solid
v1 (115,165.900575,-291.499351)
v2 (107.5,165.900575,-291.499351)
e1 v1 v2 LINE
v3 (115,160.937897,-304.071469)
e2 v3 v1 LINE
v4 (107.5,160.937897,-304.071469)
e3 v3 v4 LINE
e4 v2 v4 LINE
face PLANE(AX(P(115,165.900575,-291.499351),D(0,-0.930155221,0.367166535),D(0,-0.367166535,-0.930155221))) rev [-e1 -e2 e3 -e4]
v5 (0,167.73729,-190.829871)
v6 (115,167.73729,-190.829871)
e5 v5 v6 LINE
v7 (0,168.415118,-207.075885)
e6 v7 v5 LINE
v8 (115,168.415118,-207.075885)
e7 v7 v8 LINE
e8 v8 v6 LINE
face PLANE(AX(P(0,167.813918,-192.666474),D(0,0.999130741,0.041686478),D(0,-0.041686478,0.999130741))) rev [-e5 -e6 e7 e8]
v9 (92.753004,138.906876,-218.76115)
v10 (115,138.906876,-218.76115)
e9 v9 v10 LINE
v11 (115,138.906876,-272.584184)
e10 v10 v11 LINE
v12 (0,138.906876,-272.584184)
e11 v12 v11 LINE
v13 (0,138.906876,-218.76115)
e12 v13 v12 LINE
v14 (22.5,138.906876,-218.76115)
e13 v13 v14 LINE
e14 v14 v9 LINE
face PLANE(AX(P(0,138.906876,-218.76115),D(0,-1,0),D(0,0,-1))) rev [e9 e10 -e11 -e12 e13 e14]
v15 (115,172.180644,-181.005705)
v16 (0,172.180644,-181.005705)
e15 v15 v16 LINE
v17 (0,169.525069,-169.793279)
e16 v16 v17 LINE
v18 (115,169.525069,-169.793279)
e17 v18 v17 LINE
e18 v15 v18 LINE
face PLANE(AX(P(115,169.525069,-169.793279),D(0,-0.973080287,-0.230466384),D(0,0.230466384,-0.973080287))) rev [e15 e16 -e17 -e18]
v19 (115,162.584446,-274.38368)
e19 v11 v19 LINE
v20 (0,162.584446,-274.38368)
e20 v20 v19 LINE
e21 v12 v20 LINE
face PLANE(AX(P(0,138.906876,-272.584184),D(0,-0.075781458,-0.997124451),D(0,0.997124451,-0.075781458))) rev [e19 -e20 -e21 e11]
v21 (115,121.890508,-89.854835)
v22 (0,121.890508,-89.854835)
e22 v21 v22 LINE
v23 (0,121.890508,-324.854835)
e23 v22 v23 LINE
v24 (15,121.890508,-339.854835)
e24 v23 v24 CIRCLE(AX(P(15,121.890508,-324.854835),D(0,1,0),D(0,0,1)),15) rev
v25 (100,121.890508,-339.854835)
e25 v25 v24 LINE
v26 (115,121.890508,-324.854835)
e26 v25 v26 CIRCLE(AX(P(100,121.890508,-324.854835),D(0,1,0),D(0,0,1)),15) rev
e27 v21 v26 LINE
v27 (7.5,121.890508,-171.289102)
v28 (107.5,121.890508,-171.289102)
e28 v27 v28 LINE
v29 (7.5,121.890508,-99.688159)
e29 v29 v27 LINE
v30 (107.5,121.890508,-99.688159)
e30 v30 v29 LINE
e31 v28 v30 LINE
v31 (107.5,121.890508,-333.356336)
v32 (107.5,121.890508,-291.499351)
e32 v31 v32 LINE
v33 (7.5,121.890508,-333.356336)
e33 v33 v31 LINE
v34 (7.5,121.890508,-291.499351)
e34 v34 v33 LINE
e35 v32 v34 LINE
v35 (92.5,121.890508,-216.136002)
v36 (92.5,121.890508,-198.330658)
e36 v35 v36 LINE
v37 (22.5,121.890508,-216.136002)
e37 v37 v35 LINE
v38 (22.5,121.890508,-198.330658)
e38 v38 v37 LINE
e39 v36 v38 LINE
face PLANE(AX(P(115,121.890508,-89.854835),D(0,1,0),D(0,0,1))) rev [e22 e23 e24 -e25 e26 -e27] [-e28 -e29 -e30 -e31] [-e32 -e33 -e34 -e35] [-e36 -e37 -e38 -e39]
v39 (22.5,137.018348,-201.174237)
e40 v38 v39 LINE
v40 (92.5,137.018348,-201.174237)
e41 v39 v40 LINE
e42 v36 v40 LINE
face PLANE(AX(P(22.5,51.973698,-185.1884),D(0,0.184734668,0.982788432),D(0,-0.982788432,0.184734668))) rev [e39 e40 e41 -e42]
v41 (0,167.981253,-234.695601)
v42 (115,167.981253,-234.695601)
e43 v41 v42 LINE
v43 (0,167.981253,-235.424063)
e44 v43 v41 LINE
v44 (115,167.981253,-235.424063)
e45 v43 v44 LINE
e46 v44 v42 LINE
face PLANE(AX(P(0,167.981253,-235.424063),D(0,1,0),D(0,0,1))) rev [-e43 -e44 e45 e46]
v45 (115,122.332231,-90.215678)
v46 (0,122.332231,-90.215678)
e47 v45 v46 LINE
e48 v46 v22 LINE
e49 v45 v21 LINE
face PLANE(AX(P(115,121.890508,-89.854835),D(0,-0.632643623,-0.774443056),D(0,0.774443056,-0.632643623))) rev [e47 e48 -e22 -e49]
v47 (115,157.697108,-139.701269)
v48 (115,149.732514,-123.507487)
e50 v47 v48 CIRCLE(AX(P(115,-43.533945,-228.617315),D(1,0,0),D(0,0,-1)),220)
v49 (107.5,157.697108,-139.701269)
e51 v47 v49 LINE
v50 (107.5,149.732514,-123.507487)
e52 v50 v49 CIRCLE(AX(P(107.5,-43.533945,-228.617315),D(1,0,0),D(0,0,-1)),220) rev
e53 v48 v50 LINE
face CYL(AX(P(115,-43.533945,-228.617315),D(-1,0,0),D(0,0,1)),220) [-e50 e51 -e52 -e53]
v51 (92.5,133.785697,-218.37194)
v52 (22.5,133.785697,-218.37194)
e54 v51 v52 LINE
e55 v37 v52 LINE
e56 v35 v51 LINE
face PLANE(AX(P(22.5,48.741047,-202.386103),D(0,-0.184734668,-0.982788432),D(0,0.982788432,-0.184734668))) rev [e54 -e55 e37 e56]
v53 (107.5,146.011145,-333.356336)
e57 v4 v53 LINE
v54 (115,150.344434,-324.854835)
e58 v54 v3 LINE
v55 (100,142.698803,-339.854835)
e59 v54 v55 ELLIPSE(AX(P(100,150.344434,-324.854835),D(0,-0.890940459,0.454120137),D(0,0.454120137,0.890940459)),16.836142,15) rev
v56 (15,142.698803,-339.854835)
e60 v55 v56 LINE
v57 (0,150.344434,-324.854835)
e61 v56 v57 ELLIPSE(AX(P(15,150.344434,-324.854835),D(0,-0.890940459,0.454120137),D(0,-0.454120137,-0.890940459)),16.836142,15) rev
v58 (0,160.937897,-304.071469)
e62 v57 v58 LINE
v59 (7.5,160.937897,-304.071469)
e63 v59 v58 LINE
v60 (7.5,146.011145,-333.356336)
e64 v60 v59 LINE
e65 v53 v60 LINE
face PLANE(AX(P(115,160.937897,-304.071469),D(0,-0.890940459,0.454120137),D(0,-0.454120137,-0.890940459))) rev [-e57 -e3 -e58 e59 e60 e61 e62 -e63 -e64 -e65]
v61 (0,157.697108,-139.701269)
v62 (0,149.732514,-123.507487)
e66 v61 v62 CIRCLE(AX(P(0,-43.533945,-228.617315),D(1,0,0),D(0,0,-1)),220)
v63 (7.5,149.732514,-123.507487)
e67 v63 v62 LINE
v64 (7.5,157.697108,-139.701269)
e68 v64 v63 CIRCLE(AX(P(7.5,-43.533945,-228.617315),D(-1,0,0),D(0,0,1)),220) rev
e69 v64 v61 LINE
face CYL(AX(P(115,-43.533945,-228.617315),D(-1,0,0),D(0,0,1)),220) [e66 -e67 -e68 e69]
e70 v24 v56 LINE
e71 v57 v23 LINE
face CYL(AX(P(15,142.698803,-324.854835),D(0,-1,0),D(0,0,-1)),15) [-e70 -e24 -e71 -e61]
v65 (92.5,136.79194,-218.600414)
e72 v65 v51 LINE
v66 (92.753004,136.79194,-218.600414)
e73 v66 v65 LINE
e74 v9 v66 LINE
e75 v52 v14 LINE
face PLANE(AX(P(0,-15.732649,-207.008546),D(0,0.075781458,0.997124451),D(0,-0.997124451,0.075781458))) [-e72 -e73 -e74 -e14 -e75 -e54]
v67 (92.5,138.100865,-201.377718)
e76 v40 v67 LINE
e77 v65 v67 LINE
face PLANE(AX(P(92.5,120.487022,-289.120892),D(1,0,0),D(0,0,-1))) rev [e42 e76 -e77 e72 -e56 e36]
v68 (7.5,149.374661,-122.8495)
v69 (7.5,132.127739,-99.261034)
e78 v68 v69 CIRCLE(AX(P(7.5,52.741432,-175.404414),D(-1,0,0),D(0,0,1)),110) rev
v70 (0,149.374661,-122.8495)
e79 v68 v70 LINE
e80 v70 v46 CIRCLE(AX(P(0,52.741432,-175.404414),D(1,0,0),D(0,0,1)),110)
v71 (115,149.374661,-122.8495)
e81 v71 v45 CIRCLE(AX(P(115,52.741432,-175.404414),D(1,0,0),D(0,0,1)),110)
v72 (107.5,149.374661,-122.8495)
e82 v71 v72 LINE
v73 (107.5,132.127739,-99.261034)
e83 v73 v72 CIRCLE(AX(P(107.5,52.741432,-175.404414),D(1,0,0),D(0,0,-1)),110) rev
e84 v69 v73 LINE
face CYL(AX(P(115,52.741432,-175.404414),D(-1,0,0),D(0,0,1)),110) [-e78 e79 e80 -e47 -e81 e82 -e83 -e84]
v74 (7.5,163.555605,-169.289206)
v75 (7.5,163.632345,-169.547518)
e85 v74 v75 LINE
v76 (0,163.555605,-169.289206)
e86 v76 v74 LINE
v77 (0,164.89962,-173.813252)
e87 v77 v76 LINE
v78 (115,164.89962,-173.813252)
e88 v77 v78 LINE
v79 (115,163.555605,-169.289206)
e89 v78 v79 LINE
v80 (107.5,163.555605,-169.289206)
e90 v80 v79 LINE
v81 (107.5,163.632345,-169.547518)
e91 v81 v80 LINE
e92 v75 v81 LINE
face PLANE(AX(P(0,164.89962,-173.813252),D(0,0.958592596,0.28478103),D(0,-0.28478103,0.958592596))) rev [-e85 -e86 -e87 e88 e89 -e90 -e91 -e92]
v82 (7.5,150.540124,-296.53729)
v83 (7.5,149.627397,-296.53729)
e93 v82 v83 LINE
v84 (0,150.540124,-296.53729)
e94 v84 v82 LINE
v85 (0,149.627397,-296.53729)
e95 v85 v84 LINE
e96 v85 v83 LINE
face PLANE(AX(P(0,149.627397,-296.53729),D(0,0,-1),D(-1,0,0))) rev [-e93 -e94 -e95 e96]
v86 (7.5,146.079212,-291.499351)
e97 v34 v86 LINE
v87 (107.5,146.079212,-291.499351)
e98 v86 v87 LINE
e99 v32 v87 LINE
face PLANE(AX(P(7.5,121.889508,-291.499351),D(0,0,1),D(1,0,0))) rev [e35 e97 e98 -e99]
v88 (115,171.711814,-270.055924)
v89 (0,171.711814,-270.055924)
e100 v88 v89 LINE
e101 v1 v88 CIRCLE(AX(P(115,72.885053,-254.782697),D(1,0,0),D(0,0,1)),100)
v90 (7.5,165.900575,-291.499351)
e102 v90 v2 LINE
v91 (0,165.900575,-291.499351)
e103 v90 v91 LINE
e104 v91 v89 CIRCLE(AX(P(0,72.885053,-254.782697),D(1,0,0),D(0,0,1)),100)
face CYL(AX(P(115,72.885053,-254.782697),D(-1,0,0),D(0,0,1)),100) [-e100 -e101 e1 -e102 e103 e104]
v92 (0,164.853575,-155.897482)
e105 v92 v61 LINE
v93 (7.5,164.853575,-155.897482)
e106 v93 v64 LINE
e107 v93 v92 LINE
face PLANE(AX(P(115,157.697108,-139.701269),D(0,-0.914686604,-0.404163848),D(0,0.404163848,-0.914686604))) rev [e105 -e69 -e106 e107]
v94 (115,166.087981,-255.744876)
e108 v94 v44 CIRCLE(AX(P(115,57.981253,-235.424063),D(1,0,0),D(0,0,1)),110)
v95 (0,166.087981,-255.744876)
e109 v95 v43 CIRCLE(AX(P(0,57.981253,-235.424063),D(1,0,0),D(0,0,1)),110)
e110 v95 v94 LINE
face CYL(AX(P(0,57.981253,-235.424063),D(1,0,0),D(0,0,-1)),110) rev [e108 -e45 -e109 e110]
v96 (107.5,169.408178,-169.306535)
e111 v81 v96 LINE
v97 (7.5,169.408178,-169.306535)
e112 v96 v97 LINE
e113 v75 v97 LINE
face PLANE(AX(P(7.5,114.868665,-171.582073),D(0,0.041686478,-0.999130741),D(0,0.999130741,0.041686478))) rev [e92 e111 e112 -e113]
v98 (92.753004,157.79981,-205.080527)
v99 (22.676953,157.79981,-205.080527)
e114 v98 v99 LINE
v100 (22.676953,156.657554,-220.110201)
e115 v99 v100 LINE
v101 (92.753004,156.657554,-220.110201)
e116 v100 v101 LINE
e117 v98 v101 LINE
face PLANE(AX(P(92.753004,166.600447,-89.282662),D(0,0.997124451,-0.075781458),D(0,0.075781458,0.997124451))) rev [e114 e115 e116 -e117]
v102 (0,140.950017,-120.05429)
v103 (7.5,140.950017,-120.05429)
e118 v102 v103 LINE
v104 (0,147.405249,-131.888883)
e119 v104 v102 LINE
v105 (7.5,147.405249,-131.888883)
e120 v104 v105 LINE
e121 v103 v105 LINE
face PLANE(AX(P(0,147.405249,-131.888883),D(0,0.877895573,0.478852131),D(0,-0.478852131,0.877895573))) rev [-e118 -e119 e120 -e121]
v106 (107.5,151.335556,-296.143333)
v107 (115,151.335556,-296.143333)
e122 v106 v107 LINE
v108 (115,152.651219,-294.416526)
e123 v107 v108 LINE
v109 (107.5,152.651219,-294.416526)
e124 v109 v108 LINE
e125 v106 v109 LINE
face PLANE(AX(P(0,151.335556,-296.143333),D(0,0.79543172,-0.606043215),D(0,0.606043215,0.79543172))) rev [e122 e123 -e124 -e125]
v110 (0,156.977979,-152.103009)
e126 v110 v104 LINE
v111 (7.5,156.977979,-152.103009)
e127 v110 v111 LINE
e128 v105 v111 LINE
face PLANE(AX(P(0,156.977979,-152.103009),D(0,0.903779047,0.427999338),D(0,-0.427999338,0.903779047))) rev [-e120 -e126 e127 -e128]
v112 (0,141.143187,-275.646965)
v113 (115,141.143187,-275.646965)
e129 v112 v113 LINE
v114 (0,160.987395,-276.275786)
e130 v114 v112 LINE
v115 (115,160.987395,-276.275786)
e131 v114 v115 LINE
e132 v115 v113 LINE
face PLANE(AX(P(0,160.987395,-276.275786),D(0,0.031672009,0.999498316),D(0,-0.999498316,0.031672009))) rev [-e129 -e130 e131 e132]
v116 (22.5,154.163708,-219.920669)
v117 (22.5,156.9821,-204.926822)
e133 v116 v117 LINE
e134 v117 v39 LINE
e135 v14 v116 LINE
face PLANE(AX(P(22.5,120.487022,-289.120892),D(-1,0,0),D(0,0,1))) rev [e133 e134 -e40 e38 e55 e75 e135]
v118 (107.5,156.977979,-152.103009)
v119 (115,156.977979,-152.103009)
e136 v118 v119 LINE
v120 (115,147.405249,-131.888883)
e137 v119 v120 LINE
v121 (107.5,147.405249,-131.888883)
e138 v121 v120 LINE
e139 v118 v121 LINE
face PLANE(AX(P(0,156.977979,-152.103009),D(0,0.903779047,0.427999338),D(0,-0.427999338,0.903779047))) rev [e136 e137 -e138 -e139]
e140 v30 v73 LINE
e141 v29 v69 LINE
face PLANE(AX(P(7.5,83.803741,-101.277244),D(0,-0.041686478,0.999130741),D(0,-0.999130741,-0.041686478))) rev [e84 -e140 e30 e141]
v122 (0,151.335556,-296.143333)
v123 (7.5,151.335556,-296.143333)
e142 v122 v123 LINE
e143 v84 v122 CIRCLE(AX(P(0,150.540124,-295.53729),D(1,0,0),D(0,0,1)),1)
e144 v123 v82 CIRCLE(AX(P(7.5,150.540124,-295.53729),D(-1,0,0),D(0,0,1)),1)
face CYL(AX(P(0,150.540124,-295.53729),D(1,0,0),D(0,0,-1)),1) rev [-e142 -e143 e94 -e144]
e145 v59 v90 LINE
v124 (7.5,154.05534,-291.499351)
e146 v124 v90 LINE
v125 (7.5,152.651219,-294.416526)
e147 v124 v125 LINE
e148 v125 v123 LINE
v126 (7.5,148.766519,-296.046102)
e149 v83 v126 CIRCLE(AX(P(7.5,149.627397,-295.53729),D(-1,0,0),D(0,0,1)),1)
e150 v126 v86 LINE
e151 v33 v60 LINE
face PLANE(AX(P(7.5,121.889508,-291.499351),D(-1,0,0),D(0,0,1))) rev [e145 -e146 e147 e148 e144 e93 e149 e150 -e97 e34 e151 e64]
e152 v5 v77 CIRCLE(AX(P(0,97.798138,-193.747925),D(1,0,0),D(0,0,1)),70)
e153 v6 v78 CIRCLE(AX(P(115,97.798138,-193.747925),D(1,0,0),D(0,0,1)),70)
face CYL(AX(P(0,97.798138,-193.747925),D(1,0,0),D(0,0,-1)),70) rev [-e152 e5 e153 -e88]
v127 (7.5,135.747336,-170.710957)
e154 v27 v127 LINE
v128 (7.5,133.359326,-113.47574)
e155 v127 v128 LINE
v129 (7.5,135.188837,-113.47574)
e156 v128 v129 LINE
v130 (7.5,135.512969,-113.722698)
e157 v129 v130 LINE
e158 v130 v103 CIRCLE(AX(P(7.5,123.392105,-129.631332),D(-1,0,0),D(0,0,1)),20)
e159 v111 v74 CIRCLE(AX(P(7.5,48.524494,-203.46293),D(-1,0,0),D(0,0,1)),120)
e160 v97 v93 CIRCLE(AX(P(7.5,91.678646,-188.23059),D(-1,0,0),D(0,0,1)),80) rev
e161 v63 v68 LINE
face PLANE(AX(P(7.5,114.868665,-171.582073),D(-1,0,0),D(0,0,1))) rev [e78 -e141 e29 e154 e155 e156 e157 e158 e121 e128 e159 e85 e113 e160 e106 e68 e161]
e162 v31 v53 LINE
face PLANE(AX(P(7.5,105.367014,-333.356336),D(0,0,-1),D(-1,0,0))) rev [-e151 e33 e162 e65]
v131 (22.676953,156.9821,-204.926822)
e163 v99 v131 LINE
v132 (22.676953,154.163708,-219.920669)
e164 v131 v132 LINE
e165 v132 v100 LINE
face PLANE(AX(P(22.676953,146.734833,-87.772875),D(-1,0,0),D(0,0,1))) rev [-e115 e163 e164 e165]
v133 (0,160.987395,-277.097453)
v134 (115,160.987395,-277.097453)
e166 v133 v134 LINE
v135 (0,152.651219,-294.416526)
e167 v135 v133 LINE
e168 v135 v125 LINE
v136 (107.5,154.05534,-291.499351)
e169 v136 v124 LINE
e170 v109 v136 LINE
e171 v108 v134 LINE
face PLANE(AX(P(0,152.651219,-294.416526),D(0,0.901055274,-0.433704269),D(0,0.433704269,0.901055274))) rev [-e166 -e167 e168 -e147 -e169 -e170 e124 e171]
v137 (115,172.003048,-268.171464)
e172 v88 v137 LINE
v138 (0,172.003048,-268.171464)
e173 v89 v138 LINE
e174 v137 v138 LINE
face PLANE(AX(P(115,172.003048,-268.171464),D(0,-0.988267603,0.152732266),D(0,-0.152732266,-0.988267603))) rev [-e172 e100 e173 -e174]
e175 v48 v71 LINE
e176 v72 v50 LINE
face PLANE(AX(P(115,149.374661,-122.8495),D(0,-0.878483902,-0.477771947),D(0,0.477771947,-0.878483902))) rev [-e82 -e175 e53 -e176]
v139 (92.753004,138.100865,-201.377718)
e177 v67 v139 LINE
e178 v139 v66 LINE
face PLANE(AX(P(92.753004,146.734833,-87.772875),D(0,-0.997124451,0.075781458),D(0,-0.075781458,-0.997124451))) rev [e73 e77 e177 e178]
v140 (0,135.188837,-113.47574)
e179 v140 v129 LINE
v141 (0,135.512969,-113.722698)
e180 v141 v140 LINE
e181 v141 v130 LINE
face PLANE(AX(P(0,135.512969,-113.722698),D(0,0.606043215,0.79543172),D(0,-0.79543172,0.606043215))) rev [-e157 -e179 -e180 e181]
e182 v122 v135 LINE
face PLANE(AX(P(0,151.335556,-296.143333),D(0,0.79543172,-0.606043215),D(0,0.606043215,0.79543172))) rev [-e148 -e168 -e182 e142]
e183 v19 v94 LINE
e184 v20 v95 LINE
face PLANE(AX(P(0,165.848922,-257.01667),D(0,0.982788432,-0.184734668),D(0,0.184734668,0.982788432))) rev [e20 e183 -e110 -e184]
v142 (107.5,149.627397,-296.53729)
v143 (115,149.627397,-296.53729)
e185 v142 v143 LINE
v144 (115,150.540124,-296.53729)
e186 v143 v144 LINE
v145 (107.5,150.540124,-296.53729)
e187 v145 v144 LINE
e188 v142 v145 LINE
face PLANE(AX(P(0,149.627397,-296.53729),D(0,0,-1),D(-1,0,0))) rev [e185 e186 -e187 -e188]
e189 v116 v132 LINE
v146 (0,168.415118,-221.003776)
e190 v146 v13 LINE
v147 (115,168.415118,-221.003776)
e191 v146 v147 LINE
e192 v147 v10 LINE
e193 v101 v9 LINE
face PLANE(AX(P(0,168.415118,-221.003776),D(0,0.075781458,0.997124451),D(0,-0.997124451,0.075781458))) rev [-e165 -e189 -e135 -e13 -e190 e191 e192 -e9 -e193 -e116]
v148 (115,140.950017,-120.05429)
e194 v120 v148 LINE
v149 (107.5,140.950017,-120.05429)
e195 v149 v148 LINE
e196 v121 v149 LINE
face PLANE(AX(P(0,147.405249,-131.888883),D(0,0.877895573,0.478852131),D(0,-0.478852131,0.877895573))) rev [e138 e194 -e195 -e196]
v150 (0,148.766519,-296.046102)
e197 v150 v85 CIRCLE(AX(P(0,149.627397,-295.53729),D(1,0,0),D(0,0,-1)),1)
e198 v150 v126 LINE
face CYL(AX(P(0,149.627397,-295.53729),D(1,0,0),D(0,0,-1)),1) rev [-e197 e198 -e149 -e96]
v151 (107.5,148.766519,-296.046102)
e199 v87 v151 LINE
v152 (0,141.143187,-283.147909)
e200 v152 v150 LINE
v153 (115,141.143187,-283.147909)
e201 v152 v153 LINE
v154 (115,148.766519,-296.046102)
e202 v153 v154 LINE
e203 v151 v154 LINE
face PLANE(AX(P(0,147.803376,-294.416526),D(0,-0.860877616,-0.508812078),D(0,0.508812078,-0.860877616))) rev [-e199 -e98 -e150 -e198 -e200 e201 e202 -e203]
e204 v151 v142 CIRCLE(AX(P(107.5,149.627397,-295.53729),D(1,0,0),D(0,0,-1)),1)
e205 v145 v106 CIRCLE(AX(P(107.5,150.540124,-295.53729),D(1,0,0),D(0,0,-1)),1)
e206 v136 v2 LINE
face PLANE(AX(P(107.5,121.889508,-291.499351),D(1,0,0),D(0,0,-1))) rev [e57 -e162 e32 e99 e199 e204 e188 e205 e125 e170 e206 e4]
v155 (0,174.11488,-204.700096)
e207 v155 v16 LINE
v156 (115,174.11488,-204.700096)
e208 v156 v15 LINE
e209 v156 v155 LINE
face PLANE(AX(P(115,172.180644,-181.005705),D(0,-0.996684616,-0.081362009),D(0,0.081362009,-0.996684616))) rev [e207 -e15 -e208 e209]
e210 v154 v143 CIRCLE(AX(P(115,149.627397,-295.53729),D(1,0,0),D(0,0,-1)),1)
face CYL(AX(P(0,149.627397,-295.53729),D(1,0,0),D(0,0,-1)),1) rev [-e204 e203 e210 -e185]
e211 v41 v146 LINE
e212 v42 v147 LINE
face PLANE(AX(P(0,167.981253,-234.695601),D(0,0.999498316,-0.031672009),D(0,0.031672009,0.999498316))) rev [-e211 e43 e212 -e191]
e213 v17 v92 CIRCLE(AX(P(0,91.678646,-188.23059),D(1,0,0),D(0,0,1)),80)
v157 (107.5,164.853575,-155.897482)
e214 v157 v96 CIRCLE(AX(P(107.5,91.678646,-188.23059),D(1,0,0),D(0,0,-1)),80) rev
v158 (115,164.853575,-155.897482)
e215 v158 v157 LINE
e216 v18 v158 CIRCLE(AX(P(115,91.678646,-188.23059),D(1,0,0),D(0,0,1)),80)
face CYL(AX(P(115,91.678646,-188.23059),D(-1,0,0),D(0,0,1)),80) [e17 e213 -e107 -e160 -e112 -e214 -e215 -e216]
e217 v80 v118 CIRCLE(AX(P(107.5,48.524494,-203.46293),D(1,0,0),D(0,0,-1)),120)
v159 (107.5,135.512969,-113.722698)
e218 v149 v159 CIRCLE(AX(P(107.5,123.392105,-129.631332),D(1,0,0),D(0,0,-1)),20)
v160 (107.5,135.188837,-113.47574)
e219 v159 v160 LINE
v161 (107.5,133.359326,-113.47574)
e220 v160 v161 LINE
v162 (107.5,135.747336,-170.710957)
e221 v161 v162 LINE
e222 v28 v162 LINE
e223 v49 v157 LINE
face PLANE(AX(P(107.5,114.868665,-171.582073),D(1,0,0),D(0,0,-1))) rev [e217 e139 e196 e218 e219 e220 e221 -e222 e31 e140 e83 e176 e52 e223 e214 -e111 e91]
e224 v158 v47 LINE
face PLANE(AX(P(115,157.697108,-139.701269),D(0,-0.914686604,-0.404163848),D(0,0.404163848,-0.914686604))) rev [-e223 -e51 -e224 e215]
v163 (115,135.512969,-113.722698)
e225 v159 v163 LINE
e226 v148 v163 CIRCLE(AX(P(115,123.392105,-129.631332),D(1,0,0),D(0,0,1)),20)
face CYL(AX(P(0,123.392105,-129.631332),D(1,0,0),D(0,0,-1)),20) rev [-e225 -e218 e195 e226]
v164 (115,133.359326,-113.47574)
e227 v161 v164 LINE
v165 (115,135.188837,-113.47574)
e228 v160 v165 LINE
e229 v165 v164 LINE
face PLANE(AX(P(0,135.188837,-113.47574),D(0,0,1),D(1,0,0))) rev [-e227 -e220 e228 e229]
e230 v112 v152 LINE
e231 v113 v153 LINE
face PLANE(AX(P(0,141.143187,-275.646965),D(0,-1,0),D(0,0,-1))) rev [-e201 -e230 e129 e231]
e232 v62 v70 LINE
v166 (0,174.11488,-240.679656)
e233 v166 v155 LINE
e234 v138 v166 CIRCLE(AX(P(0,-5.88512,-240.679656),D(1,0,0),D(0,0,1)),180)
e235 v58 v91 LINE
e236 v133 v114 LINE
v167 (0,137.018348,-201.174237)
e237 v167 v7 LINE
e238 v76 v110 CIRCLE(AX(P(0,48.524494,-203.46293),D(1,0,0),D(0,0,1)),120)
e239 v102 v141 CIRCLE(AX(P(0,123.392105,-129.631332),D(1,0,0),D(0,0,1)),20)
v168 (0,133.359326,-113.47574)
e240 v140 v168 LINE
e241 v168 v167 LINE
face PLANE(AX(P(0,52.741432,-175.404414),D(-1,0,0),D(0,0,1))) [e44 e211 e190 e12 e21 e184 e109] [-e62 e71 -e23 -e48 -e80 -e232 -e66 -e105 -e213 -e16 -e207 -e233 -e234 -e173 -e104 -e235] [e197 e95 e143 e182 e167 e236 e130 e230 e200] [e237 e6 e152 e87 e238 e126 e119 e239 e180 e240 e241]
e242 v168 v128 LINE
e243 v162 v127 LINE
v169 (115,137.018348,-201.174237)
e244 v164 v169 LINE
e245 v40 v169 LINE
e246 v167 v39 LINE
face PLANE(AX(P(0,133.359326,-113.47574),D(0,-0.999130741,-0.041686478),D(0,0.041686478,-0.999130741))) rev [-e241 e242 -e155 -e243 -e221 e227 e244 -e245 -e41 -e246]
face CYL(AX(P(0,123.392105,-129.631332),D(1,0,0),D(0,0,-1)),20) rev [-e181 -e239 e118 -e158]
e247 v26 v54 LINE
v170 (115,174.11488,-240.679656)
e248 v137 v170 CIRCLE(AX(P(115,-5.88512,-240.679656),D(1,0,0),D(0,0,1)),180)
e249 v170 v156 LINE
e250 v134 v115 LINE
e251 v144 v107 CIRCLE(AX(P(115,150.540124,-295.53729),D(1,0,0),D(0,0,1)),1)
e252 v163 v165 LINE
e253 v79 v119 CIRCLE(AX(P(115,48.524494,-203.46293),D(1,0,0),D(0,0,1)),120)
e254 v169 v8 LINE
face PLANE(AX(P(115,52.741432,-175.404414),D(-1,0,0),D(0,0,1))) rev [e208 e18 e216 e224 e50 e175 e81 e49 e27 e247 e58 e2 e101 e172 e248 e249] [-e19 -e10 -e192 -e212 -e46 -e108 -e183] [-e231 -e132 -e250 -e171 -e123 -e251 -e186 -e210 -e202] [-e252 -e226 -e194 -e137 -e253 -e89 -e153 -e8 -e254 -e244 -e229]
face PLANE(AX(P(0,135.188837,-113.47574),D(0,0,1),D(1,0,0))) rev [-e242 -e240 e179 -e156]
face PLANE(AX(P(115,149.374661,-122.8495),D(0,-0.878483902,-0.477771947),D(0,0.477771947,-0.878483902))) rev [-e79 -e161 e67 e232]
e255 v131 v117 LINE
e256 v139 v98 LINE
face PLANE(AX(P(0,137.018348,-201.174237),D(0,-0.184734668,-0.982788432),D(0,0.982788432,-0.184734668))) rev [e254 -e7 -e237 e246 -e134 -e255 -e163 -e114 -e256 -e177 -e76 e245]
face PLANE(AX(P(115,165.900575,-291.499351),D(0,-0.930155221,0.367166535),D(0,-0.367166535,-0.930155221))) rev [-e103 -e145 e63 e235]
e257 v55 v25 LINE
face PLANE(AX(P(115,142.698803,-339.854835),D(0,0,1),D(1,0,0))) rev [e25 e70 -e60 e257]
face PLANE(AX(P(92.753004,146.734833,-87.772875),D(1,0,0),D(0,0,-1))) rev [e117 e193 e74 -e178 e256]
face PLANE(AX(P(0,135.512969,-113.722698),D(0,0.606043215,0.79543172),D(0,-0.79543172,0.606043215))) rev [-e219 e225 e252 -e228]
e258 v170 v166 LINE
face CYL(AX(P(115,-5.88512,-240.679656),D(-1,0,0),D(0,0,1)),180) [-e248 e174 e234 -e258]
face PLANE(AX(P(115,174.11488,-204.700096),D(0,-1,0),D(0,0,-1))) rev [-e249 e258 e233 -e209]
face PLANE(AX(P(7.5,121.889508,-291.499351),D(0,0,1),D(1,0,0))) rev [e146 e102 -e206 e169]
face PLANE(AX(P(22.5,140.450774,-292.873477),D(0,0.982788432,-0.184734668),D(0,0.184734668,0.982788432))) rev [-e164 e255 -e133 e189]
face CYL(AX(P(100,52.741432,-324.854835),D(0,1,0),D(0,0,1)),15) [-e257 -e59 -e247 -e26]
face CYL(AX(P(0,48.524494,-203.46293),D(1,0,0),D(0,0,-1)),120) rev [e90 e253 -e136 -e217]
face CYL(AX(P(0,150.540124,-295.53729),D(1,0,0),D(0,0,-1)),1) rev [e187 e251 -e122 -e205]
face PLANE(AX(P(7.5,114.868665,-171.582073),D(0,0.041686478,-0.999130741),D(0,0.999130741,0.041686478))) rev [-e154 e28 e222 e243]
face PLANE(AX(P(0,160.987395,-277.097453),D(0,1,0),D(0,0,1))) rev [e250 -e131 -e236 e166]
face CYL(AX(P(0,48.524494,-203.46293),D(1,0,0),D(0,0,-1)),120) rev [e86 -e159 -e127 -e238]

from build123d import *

# Parameters (mm, degrees)
BOSS_EXTRUDE1_DEPTH = 115
CUT_EXTRUDE1_DEPTH  = 115
CUT_EXTRUDE2_START  = 7.5
CUT_EXTRUDE2_DEPTH  = 100
CUT_EXTRUDE3_START  = 7.5
CUT_EXTRUDE3_DEPTH  = 100
CUT_EXTRUDE4_REACH  = 260.68
SKETCH6_W           = 70.076051312
SKETCH6_H           = 19.92290321
CUT_EXTRUDE5_REACH  = 293.015
SKETCH5_W           = 70
SKETCH5_H           = 20.313376992
CUT_EXTRUDE6_REACH  = 334.213
SKETCH7_W           = 70
SKETCH7_H           = 17.498886338
FILLET1_R           = 15


# Read off the part's stored shape, not the designer's step: Cut-Extrude2, Cut-Extrude3
with BuildPart() as part:
    # Sketch1 → Boss-Extrude1 (new body)
    with BuildSketch(Plane(origin=(0, 0, 0), x_dir=(0, 0, -1), z_dir=(1, 0, 0))):
        with BuildLine():
            Line((89.8548345, 121.890508387), (339.8548345, 121.890508387))
            Line((339.8548345, 121.890508387), (339.8548345, 142.698803067))
            Line((339.8548345, 142.698803067), (328.974757131, 148.244473571))
            Line((328.974757131, 148.244473571), (304.07146893, 160.937897169))
            Line((304.07146893, 160.937897169), (291.499350701, 165.900575417))
            ThreePointArc((291.499350701, 165.900575417), (280.939522904, 169.403551358), (270.055923817, 171.711813574))
            Line((270.055923817, 171.711813574), (268.171463935, 172.003048284))
            ThreePointArc((268.171463935, 172.003048284), (254.466056361, 173.586145336), (240.679656072, 174.114879761))
            Line((240.679656072, 174.114879761), (232.021178794, 174.114879761))
            Line((232.021178794, 174.114879761), (204.700095622, 174.114879761))
            Line((204.700095622, 174.114879761), (181.005704906, 172.180643784))
            Line((181.005704906, 172.180643784), (169.793278807, 169.525069181))
            ThreePointArc((169.793278807, 169.525069181), (162.738148163, 167.508293641), (155.897481651, 164.85357451))
            Line((155.897481651, 164.85357451), (139.701268702, 157.697108323))
            ThreePointArc((139.701268702, 157.697108323), (131.522677332, 153.88092637), (123.507487012, 149.732513946))
            Line((123.507487012, 149.732513946), (122.849499947, 149.374661332))
            ThreePointArc((122.849499947, 149.374661332), (105.217865801, 137.440006065), (90.215677989, 122.332230589))
            Line((90.215677989, 122.332230589), (89.8548345, 121.890508387))
        make_face()
    extrude(amount=BOSS_EXTRUDE1_DEPTH)

    # Sketch2 → Cut-Extrude1 (cut)
    with BuildSketch(Plane(origin=(115, 0, 0), x_dir=(0, 0, -1), z_dir=(1, 0, 0))):
        with BuildLine():
            Line((113.475739659, 133.359325966), (201.174236889, 137.018348058))
            Line((201.174236889, 137.018348058), (207.075885424, 168.415118264))
            Line((207.075885424, 168.415118264), (192.666474105, 167.813918061))
            Line((192.666474105, 167.813918061), (190.829871081, 167.73728994))
            ThreePointArc((190.829871081, 167.73728994), (182.233808887, 166.844681368), (173.813252446, 164.899619793))
            Line((173.813252446, 164.899619793), (169.2892062, 163.555605085))
            ThreePointArc((169.2892062, 163.555605085), (160.569837528, 160.5967142), (152.103009161, 156.977979241))
            Line((152.103009161, 156.977979241), (131.888883088, 147.40524948))
            Line((131.888883088, 147.40524948), (120.054289503, 140.950016615))
            ThreePointArc((120.054289503, 140.950016615), (116.601738736, 138.565427019), (113.722697716, 135.512969462))
            Line((113.722697716, 135.512969462), (113.475739659, 135.188837012))
            Line((113.475739659, 135.188837012), (113.475739659, 133.359325966))
        make_face()
        with BuildLine():
            Line((221.003775967, 168.415118264), (218.761149524, 138.906875589))
            Line((218.761149524, 138.906875589), (272.584184163, 138.906875589))
            Line((272.584184163, 138.906875589), (274.383679522, 162.58444611))
            Line((274.383679522, 162.58444611), (267.028526617, 163.966993649))
            Line((267.028526617, 163.966993649), (257.016670223, 165.848921543))
            Line((257.016670223, 165.848921543), (255.744876296, 166.087980551))
            ThreePointArc((255.744876296, 166.087980551), (245.628472921, 167.506912168), (235.424062848, 167.981253005))
            Line((235.424062848, 167.981253005), (234.695600568, 167.981253005))
            Line((234.695600568, 167.981253005), (221.003775967, 168.415118264))
        make_face()
        with BuildLine():
            Line((276.275786009, 160.987395212), (275.646964577, 141.143186512))
            Line((275.646964577, 141.143186512), (283.14790924, 141.143186512))
            Line((283.14790924, 141.143186512), (294.416525801, 147.803376186))
            Line((294.416525801, 147.803376186), (296.046101937, 148.766518919))
            ThreePointArc((296.046101937, 148.766518919), (296.405855365, 149.13182216), (296.537289859, 149.627396535))
            Line((296.537289859, 149.627396535), (296.537289859, 150.540124257))
            ThreePointArc((296.537289859, 150.540124257), (296.433404588, 150.983946735), (296.143333074, 151.335555977))
            Line((296.143333074, 151.335555977), (294.416525801, 152.651218661))
            Line((294.416525801, 152.651218661), (277.097452917, 160.987395212))
            Line((277.097452917, 160.987395212), (276.275786009, 160.987395212))
        make_face()
    extrude(amount=-CUT_EXTRUDE1_DEPTH, mode=Mode.SUBTRACT)

    # Cut-Extrude2 outline → Cut-Extrude2 (cut)
    with BuildSketch(Plane.YZ.offset(CUT_EXTRUDE2_START)):
        with BuildLine():
            Line((121.890508387, -99.688159251), (121.890508387, -171.289102204))
            Line((121.890508387, -171.289102204), (135.747336393, -170.710957294))
            Line((135.747336393, -170.710957294), (133.359325966, -113.475739659))
            Line((133.359325966, -113.475739659), (135.188837012, -113.475739659))
            Line((135.188837012, -113.475739659), (135.512969462, -113.722697716))
            ThreePointArc((135.512969462, -113.722697716), (138.565427019, -116.601738736), (140.950016615, -120.054289503))
            Line((140.950016615, -120.054289503), (147.40524948, -131.888883088))
            Line((147.40524948, -131.888883088), (156.977979241, -152.103009161))
            ThreePointArc((156.977979241, -152.103009161), (160.5967142, -160.569837528), (163.555605085, -169.2892062))
            Line((163.555605085, -169.2892062), (163.632345036, -169.547518172))
            Line((163.632345036, -169.547518172), (169.408178174, -169.306534555))
            ThreePointArc((169.408178174, -169.306534555), (167.428165725, -162.501028912), (164.85357451, -155.897481651))
            Line((164.85357451, -155.897481651), (157.697108323, -139.701268702))
            ThreePointArc((157.697108323, -139.701268702), (153.88092637, -131.522677332), (149.732513946, -123.507487012))
            Line((149.732513946, -123.507487012), (149.374661332, -122.849499947))
            ThreePointArc((149.374661332, -122.849499947), (141.537958861, -110.480020928), (132.127738515, -99.261033903))
            Line((132.127738515, -99.261033903), (121.890508387, -99.688159251))
        make_face()
    extrude(amount=CUT_EXTRUDE2_DEPTH, mode=Mode.SUBTRACT)

    # Cut-Extrude3 outline → Cut-Extrude3 (cut)
    with BuildSketch(Plane.YZ.offset(CUT_EXTRUDE3_START)):
        with BuildLine():
            Line((121.890508387, -291.499350701), (121.890508387, -333.35633566))
            Line((121.890508387, -333.35633566), (146.011144709, -333.35633566))
            Line((146.011144709, -333.35633566), (160.937897169, -304.07146893))
            Line((160.937897169, -304.07146893), (165.900575417, -291.499350701))
            Line((165.900575417, -291.499350701), (154.055340396, -291.499350701))
            Line((154.055340396, -291.499350701), (152.651218661, -294.416525801))
            Line((152.651218661, -294.416525801), (151.335555977, -296.143333074))
            ThreePointArc((151.335555977, -296.143333074), (150.983946735, -296.433404588), (150.540124257, -296.537289859))
            Line((150.540124257, -296.537289859), (149.627396535, -296.537289859))
            ThreePointArc((149.627396535, -296.537289859), (149.13182216, -296.405855365), (148.766518919, -296.046101937))
            Line((148.766518919, -296.046101937), (146.079212499, -291.499350701))
            Line((146.079212499, -291.499350701), (121.890508387, -291.499350701))
        make_face()
    extrude(amount=CUT_EXTRUDE3_DEPTH, mode=Mode.SUBTRACT)

    # Cut-Extrude4: up to this plane
    cut_extrude4_end = Plane(origin=(0, 137.018348058, -201.174236889), z_dir=(0, -0.18473466771426061, -0.9827884322398701))
    # Sketch6 → Cut-Extrude4 (cut, up to the surface)
    with BuildSketch(Plane(origin=(0, -15.732649467, -207.008545619), x_dir=(-1, 0, 0), z_dir=(0, -0.07578145826840303, -0.9971244509000441)), mode=Mode.PRIVATE) as cut_extrude4_sk1:
        with Locations((-57.714978641, 162.925898332)):
            Rectangle(SKETCH6_W, SKETCH6_H)
    cut_extrude4_tool1 = split(extrude(cut_extrude4_sk1.sketch, amount=-CUT_EXTRUDE4_REACH, mode=Mode.PRIVATE), bisect_by=cut_extrude4_end, keep=Keep.BOTH, mode=Mode.PRIVATE)
    add(cut_extrude4_tool1.solids().sort_by_distance((57.714979, 146.724747, -219.355308))[0], mode=Mode.SUBTRACT)

    # Cut-Extrude5: up to this plane
    cut_extrude5_end = Plane(origin=(0, 168.415118264, -221.003775967), z_dir=(0, 0.07578145826840302, 0.9971244509000441))
    # Sketch5 → Cut-Extrude5 (cut, up to the surface)
    with BuildSketch(Plane(origin=(0, -31.848196468, -169.432405211), x_dir=(1, 0, 0), z_dir=(0, 0.18473466771426064, 0.9827884322398701)), mode=Mode.PRIVATE) as cut_extrude5_sk1:
        with Locations((57.5, 181.980591777)):
            Rectangle(SKETCH5_W, SKETCH5_H)
    cut_extrude5_tool1 = split(extrude(cut_extrude5_sk1.sketch, amount=-CUT_EXTRUDE5_REACH, mode=Mode.PRIVATE), bisect_by=cut_extrude5_end, keep=Keep.BOTH, mode=Mode.PRIVATE)
    add(cut_extrude5_tool1.solids().sort_by_distance((57.5, 147.000224, -203.050529))[0], mode=Mode.SUBTRACT)

    # Cut-Extrude6: up to this plane
    cut_extrude6_end = Plane(origin=(115, 121.890508387, -89.8548345), z_dir=(0, 1, 0))
    # Sketch7 → Cut-Extrude6 (cut, up to the surface)
    with BuildSketch(Plane(origin=(0, 168.866544526, -31.741831678), x_dir=(1, 0, 0), z_dir=(0, 0.9827884322398701, -0.18473466771426067)), mode=Mode.PRIVATE) as cut_extrude6_sk1:
        with Locations((57.5, 181.149117049)):
            Rectangle(SKETCH7_W, SKETCH7_H)
    cut_extrude6_tool1 = split(extrude(cut_extrude6_sk1.sketch, amount=-CUT_EXTRUDE6_REACH, mode=Mode.PRIVATE), bisect_by=cut_extrude6_end, keep=Keep.BOTH, mode=Mode.PRIVATE)
    add(cut_extrude6_tool1.solids().sort_by_distance((57.5, 135.402023, -209.773088))[0], mode=Mode.SUBTRACT)

    # Fillet1
    fillet1_edges = [part.edges().sort_by_distance(p)[0] for p in [
        (115, 132.294655727, -339.8548345),
        (0, 132.294655727, -339.8548345),
    ]]
    fillet(fillet1_edges, radius=FILLET1_R)


solid = part.part
